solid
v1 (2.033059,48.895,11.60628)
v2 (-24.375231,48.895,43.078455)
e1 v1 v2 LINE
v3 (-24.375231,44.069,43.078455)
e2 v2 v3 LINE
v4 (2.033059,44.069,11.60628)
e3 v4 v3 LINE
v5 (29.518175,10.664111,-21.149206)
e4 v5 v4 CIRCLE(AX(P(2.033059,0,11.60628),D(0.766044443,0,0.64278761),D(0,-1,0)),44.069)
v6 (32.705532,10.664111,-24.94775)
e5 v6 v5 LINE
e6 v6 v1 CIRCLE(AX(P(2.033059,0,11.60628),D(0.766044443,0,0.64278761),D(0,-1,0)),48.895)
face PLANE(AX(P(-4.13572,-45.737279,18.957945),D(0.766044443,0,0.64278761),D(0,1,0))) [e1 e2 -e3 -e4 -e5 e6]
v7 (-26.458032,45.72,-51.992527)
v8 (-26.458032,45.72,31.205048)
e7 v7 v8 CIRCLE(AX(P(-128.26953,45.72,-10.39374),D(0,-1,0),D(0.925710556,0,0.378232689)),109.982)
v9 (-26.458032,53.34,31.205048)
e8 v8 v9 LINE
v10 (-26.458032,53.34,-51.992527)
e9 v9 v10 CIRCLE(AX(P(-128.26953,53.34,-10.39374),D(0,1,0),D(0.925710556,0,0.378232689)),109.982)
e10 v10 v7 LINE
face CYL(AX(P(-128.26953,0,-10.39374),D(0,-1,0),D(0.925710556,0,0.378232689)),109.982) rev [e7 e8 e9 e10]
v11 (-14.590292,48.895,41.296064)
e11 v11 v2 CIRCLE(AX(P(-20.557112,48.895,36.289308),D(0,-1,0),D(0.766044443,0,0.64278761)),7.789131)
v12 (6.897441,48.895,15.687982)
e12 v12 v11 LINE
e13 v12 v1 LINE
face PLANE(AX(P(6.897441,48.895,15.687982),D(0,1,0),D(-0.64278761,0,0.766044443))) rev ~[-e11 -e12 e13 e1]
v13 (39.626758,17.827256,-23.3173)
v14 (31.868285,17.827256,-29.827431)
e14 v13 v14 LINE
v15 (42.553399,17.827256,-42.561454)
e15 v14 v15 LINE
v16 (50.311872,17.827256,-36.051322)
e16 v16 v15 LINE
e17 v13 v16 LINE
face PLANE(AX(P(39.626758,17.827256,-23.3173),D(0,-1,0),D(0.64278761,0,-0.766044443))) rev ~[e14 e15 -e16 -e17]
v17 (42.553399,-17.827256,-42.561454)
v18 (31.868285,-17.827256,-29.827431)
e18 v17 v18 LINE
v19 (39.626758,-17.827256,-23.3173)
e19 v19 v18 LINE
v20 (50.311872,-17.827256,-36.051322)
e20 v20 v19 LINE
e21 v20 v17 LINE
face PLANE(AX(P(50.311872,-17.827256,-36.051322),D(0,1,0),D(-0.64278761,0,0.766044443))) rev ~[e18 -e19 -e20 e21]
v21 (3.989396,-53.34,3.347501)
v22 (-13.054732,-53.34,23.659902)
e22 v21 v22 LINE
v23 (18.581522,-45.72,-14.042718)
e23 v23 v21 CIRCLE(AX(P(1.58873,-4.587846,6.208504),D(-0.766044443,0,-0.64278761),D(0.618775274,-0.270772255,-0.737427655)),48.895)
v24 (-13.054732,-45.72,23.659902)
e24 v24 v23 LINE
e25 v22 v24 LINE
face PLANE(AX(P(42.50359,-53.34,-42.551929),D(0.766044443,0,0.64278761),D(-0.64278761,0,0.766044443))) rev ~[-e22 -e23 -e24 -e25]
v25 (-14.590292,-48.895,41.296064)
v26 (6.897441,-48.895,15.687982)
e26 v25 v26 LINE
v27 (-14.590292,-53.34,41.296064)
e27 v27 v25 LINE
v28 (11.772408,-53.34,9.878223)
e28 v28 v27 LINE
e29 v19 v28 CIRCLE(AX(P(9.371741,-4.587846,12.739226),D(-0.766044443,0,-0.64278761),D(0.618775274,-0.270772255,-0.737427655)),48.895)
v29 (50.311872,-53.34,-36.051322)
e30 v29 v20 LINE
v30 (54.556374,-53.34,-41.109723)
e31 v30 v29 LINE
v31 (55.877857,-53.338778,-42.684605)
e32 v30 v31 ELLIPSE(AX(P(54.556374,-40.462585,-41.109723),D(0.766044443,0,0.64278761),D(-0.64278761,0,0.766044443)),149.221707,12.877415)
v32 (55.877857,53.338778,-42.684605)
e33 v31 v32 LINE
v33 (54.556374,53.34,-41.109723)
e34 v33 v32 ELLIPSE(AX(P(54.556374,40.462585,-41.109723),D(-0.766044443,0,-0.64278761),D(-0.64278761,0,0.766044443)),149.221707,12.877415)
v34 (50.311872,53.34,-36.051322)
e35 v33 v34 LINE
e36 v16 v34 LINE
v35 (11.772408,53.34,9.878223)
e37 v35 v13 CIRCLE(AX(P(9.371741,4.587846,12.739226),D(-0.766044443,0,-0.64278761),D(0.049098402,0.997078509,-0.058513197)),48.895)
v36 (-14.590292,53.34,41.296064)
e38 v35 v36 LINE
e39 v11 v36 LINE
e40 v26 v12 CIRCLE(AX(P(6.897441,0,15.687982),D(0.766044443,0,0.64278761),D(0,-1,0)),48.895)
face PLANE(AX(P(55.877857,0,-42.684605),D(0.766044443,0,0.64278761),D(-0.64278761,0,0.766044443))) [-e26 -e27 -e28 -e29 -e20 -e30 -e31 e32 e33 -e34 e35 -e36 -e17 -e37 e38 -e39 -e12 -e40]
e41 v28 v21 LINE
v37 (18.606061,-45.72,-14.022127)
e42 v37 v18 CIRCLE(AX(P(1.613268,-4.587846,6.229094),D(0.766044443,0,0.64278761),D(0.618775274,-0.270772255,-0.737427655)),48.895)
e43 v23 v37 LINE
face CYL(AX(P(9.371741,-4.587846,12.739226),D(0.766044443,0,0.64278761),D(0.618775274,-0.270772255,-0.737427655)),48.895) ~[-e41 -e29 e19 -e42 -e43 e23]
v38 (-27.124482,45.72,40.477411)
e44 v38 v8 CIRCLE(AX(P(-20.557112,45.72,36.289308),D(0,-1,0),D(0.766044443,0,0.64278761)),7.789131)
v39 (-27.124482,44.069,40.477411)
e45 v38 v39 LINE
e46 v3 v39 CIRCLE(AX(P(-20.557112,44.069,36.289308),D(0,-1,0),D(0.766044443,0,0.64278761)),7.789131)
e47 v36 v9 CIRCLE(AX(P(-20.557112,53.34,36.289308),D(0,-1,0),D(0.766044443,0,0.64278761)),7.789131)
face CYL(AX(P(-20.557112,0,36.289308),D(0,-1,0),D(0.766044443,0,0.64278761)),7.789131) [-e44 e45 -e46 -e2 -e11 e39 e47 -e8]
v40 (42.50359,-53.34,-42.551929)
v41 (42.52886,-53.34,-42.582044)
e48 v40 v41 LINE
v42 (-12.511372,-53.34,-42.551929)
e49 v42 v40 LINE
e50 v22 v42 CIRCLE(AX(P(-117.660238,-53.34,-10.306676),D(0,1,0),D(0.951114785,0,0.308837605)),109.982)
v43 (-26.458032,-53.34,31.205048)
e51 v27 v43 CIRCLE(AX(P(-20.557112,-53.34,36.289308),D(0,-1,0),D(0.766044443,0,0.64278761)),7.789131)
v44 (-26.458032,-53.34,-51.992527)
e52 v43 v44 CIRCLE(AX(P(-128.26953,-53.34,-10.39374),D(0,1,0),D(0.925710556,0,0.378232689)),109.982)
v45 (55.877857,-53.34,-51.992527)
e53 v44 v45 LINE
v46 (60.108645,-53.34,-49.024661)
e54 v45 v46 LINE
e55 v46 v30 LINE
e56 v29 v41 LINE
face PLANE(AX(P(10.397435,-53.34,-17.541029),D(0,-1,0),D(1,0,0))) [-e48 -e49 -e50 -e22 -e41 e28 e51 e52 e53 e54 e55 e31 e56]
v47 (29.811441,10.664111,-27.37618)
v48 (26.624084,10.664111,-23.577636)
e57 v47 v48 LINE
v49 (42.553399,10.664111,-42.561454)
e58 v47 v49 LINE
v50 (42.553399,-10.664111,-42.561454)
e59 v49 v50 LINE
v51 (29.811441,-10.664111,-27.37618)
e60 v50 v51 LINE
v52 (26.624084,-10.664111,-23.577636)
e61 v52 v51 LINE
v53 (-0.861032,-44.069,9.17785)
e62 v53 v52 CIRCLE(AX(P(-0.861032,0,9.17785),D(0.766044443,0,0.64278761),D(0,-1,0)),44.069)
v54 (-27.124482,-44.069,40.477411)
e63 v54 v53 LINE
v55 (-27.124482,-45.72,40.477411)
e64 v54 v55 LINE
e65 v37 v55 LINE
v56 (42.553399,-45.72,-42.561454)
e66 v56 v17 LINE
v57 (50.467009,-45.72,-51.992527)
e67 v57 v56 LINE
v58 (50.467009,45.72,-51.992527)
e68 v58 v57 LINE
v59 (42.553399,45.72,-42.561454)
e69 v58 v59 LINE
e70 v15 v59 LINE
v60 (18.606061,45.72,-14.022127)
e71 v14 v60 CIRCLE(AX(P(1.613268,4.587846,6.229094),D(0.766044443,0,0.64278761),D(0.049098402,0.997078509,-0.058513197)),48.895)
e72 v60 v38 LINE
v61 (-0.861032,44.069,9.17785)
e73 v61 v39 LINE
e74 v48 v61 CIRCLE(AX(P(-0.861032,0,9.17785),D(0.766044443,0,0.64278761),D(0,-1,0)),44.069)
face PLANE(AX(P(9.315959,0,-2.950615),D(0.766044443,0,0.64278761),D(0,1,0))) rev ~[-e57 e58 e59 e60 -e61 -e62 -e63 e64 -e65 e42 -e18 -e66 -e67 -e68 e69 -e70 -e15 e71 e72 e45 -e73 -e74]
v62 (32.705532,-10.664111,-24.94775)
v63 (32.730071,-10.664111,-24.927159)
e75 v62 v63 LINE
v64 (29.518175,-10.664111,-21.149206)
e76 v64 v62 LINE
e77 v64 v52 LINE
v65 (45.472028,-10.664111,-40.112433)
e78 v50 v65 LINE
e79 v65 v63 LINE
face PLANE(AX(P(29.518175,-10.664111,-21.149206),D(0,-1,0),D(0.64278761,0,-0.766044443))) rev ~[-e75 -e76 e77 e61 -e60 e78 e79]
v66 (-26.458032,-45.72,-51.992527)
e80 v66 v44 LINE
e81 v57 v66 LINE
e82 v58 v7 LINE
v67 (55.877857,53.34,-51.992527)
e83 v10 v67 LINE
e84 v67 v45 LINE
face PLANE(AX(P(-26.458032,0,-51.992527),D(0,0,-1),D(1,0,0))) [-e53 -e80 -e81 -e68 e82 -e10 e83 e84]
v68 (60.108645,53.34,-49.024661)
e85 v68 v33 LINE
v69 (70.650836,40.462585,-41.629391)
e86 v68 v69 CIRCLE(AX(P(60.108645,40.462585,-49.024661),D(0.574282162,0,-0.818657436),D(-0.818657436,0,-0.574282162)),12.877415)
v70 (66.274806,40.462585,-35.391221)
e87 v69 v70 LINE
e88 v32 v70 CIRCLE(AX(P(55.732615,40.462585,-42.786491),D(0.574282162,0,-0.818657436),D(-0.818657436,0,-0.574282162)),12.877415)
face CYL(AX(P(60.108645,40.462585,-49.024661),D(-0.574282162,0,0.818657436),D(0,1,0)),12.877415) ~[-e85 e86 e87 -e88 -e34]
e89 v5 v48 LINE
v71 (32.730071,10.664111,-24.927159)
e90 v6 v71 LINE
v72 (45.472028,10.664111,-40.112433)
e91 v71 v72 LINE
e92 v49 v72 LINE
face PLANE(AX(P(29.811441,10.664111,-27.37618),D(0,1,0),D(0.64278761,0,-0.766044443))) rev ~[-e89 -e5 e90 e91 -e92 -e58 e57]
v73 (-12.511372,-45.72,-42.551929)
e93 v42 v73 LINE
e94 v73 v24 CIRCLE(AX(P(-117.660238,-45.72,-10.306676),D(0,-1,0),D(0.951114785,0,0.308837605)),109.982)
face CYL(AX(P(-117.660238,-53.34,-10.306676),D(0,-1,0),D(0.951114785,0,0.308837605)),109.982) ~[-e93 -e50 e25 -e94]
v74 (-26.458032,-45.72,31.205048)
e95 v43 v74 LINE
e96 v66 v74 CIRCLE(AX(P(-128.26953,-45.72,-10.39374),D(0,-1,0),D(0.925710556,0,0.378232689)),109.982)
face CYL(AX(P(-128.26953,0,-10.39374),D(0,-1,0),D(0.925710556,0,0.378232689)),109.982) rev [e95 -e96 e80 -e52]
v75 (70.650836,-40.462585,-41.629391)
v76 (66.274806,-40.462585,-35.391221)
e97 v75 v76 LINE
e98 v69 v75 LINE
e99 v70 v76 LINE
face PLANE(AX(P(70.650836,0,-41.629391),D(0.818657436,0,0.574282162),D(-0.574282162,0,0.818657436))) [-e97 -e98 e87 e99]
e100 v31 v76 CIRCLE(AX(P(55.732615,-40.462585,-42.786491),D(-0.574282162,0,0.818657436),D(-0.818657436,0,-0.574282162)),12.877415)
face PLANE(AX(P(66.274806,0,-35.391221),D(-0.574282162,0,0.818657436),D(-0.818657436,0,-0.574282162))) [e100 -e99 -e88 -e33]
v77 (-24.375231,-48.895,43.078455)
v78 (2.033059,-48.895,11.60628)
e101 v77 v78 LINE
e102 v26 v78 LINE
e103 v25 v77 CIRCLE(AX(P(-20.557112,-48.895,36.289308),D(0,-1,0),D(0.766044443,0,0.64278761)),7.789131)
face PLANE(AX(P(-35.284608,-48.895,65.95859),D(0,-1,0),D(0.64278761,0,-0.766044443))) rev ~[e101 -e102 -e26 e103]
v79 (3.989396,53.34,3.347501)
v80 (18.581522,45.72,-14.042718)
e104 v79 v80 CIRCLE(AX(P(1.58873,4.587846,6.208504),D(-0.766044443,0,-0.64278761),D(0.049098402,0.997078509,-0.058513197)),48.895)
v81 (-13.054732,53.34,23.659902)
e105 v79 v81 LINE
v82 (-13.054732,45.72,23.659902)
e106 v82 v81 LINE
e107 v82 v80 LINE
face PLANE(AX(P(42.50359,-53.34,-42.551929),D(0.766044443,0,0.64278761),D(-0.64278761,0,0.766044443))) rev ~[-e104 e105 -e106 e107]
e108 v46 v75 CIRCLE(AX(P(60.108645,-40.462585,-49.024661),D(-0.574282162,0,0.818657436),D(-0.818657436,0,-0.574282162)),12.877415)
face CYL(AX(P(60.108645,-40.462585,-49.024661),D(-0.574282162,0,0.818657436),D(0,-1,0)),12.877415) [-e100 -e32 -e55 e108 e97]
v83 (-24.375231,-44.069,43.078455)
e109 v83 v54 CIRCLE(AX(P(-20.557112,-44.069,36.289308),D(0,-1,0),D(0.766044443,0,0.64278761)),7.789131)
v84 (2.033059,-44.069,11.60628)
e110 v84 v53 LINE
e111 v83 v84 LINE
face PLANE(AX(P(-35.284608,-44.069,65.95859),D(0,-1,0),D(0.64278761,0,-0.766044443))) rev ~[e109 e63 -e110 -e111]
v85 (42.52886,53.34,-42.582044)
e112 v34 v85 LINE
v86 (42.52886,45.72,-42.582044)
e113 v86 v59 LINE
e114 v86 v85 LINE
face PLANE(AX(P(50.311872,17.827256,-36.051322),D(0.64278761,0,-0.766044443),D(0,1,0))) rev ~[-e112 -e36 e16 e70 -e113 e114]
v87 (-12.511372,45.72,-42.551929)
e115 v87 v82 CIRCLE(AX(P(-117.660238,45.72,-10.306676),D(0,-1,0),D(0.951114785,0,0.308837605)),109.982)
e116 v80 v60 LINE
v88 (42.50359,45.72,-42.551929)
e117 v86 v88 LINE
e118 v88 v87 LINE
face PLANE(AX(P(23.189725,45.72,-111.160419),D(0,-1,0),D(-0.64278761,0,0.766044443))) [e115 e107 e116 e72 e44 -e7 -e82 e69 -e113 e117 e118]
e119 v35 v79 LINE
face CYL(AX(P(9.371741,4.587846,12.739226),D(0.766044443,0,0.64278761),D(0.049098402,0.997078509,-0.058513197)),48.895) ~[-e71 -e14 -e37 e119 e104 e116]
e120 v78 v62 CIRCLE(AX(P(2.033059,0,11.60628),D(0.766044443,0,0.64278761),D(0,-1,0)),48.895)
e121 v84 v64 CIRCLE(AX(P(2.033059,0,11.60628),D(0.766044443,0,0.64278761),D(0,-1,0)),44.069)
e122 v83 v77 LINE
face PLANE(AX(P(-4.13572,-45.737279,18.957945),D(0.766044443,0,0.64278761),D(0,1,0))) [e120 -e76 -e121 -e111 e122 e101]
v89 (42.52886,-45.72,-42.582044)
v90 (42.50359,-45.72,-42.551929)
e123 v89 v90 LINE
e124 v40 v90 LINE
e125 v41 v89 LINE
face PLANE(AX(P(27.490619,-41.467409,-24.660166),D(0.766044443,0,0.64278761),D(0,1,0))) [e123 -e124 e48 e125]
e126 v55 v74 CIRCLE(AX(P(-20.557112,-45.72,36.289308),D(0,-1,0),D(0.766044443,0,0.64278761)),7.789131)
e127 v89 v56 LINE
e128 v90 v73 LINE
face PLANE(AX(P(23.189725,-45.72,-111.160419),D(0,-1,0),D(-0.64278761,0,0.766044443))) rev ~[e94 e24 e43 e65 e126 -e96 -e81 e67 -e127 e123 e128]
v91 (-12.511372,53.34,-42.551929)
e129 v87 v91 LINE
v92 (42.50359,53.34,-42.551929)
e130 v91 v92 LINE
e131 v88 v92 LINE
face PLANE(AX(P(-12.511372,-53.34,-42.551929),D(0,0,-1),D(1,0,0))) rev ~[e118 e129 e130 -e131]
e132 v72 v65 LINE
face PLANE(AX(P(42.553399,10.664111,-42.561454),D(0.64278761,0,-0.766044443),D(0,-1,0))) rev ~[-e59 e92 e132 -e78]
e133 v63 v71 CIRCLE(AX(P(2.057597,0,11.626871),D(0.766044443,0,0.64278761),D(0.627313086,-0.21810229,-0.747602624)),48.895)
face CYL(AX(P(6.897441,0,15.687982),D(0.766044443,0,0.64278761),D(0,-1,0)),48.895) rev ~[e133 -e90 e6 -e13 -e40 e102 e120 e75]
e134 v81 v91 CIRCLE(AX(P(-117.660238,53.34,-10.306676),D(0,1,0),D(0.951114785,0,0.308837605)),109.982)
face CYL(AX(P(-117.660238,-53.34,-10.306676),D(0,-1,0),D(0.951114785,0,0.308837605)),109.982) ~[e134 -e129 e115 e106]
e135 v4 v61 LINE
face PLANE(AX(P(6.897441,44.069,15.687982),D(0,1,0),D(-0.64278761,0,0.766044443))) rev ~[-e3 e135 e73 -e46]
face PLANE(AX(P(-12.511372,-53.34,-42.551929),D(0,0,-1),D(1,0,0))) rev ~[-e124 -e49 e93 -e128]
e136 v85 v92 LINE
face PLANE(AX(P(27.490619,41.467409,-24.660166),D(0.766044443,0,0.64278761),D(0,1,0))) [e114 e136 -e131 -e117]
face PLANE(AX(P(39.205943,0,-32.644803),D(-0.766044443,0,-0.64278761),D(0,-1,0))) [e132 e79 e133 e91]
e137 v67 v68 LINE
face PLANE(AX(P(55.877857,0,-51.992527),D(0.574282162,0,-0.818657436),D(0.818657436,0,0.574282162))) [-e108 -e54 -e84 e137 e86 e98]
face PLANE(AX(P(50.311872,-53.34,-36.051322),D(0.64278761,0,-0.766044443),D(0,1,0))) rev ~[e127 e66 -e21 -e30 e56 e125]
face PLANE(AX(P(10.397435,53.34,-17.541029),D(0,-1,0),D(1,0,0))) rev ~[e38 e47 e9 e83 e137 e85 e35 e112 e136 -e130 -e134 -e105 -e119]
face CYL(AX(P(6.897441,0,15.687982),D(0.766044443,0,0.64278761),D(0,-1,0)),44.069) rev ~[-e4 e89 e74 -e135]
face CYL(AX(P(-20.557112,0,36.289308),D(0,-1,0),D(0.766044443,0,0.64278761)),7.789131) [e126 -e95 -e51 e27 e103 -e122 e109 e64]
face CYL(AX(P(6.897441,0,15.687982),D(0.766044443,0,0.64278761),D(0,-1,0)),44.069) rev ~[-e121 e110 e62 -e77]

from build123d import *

# Parameters (mm, degrees)
F1_DEPTH  = 53.34
F2_W      = 4.826
F2_H      = 32.1946403572
F3_DEPTH  = 6.35
F5_DEPTH  = 106.68
F7_W      = 91.44
F7_H      = 183.6228075896
F8_DEPTH  = 58.928
F9_DEPTH  = 25.4
F10_R     = 12.8774151417
F11_DEPTH = 10.16
F13_DEPTH = 25.4
F15_DEPTH = 3.81


# Not quite as in the source:
# - a feature names something its author has since deleted; it is built from what else it names


with BuildPart() as f1:
    # F0 (on Front) → F1 (new body, symmetric)
    with BuildSketch(Plane.XZ):
        with BuildLine():
            ThreePointArc((-26.4580316219, 31.2050478526), (-18.2875299748, -10.3937397156), (-26.4580316219, -51.9925272838))
            Line((-26.4580316219, -51.9925272838), (55.8778569108, -51.9925272838))
            Line((55.8778569108, -51.9925272838), (70.650836429, -41.6293909539))
            Line((70.650836429, -41.6293909539), (66.2748063527, -35.3912212887))
            Line((66.2748063527, -35.3912212887), (55.8778569108, -42.6846047493))
            Line((55.8778569108, -42.6846047493), (-14.5902915946, 41.2960643955))
            ThreePointArc((-14.5902915946, 41.2960643955), (-25.6027276184, 42.2233043466), (-26.4580316219, 31.2050478526))
        make_face()
    extrude(amount=F1_DEPTH, both=True)

    # F2 (on face) → F3 (cut)
    with BuildSketch(Plane(origin=(11.772407622, 0, 9.8782228937), x_dir=(0, 1, 0), z_dir=(0.7660444431, 0, 0.6427876097))):
        with BuildLine():
            ThreePointArc((-44.069, 28.7653259742), (-47.673235573, 18.4461288519), (-48.895, 7.584101647))
            Line((-48.895, 7.584101647), (-44.069, 7.584101647))
            Line((-44.069, 7.584101647), (-44.069, 28.7653259742))
        make_face()
        with BuildLine():
            ThreePointArc((44.069, 28.7653259742), (47.673235573, 18.4461288519), (48.895, 7.584101647))
            Line((48.895, 7.584101647), (48.895, 41.0130793115))
            Line((48.895, 41.0130793115), (44.069, 41.0130793115))
            Line((44.069, 41.0130793115), (44.069, 28.7653259742))
        make_face()
        with BuildLine():
            Line((-44.069, 41.0130793115), (-35.6822711903, 41.0130793115))
            ThreePointArc((-35.6822711903, 41.0130793115), (-19.4449371571, 52.4462844288), (0, 56.479101647))
            Line((0, 56.479101647), (0, 73.2077196687))
            Line((0, 73.2077196687), (-44.069, 73.2077196687))
            Line((-44.069, 73.2077196687), (-44.069, 41.0130793115))
        make_face()
        with Locations((-46.482, 57.1103994901)):
            Rectangle(F2_W, F2_H)
        with BuildLine():
            ThreePointArc((0, 56.479101647), (-19.4449371571, 52.4462844288), (-35.6822711903, 41.0130793115))
            Line((-35.6822711903, 41.0130793115), (-28.7155047544, 41.0130793115))
            ThreePointArc((-28.7155047544, 41.0130793115), (-15.3116809054, 48.9075718407), (0, 51.653101647))
            Line((0, 51.653101647), (0, 56.479101647))
        make_face()
        with BuildLine():
            Line((28.7155047544, 41.0130793115), (35.6822711903, 41.0130793115))
            ThreePointArc((35.6822711903, 41.0130793115), (19.4449371571, 52.4462844288), (0, 56.479101647))
            Line((0, 56.479101647), (0, 51.653101647))
            ThreePointArc((0, 51.653101647), (15.3116809054, 48.9075718407), (28.7155047544, 41.0130793115))
        make_face()
        with BuildLine():
            Line((-48.895, 41.0130793115), (-48.895, 7.584101647))
            ThreePointArc((-48.895, 7.584101647), (-47.673235573, 18.4461288519), (-44.069, 28.7653259742))
            Line((-44.069, 28.7653259742), (-44.069, 41.0130793115))
            Line((-44.069, 41.0130793115), (-48.895, 41.0130793115))
        make_face()
        with BuildLine():
            ThreePointArc((0, 56.479101647), (19.4449371571, 52.4462844288), (35.6822711903, 41.0130793115))
            Line((35.6822711903, 41.0130793115), (44.069, 41.0130793115))
            Line((44.069, 41.0130793115), (44.069, 73.082752475))
            Line((44.069, 73.082752475), (0, 73.2077196687))
            Line((0, 73.2077196687), (0, 56.479101647))
        make_face()
        with BuildLine():
            Line((-44.069, 41.0130793115), (-44.069, 28.7653259742))
            ThreePointArc((-44.069, 28.7653259742), (-40.3431305128, 35.2093228303), (-35.6822711903, 41.0130793115))
            Line((-35.6822711903, 41.0130793115), (-44.069, 41.0130793115))
        make_face()
        with BuildLine():
            ThreePointArc((-35.6822711903, 41.0130793115), (-40.3431305128, 35.2093228303), (-44.069, 28.7653259742))
            Line((-44.069, 28.7653259742), (-44.069, 7.584101647))
            ThreePointArc((-44.069, 7.584101647), (-40.0470993957, 25.9772142435), (-28.7155047544, 41.0130793115))
            Line((-28.7155047544, 41.0130793115), (-35.6822711903, 41.0130793115))
        make_face()
        with BuildLine():
            Line((44.069, 7.584101647), (44.069, 28.7653259742))
            ThreePointArc((44.069, 28.7653259742), (40.3431305128, 35.2093228303), (35.6822711903, 41.0130793115))
            Line((35.6822711903, 41.0130793115), (28.7155047544, 41.0130793115))
            ThreePointArc((28.7155047544, 41.0130793115), (40.0470993957, 25.9772142435), (44.069, 7.584101647))
        make_face()
        with BuildLine():
            Line((-44.069, 7.584101647), (-48.895, 7.584101647))
            ThreePointArc((-48.895, 7.584101647), (0, -41.310898353), (48.895, 7.584101647))
            ThreePointArc((48.895, 7.584101647), (47.673235573, 18.4461288519), (44.069, 28.7653259742))
            Line((44.069, 28.7653259742), (44.069, 7.584101647))
            ThreePointArc((44.069, 7.584101647), (0, -36.484898353), (-44.069, 7.584101647))
        make_face()
        with BuildLine():
            Line((0, 7.584101647), (-44.069, 7.584101647))
            ThreePointArc((-44.069, 7.584101647), (0, -36.484898353), (44.069, 7.584101647))
            ThreePointArc((44.069, 7.584101647), (40.0470993957, 25.9772142435), (28.7155047544, 41.0130793115))
            Line((28.7155047544, 41.0130793115), (0, 41.0130793115))
            Line((0, 41.0130793115), (0, 7.584101647))
        make_face()
        with BuildLine():
            ThreePointArc((-28.7155047544, 41.0130793115), (-40.0470993957, 25.9772142435), (-44.069, 7.584101647))
            Line((-44.069, 7.584101647), (0, 7.584101647))
            Line((0, 7.584101647), (0, 41.0130793115))
            Line((0, 41.0130793115), (-28.7155047544, 41.0130793115))
        make_face()
        with BuildLine():
            ThreePointArc((35.6822711903, 41.0130793115), (40.3431305128, 35.2093228303), (44.069, 28.7653259742))
            Line((44.069, 28.7653259742), (44.069, 41.0130793115))
            Line((44.069, 41.0130793115), (35.6822711903, 41.0130793115))
        make_face()
        Polygon((44.069, 41.0130793115), (48.895, 41.0130793115), (48.895, 73.2077196687), (44.069, 73.2077196687), (44.069, 73.082752475), align=None)
    extrude(amount=-F3_DEPTH, mode=Mode.SUBTRACT)

    # F4 (on face) → F5 (cut, through all)
    with BuildSketch(Plane.XZ.offset(53.34)):
        with BuildLine():
            Line((42.5035902841, -42.5519285295), (-13.0547319913, 23.6599016408))
            ThreePointArc((-13.0547319913, 23.6599016408), (-7.6819414216, -9.4041517757), (-12.5113723521, -42.5519285295))
            Line((-12.5113723521, -42.5519285295), (42.5035902841, -42.5519285295))
        make_face()
    extrude(amount=-F5_DEPTH, mode=Mode.SUBTRACT)

    # F7 (on face) → F8 (cut)
    with BuildSketch(Plane(origin=(-41.1275322828, 0, -34.5100971697), x_dir=(0, 1, 0), z_dir=(0.7660444431, 0, 0.6427876097))):
        with Locations((0, -8.2484856248)):
            Rectangle(F7_W, F7_H)
    extrude(amount=F8_DEPTH, mode=Mode.SUBTRACT)

    # F2 (on face) → F9 (cut)
    with BuildSketch(Plane(origin=(11.772407622, 0, 9.8782228937), x_dir=(0, 1, 0), z_dir=(0.7660444431, 0, 0.6427876097))):
        with BuildLine():
            ThreePointArc((-28.7155047544, 41.0130793115), (-40.0470993957, 25.9772142435), (-44.069, 7.584101647))
            Line((-44.069, 7.584101647), (0, 7.584101647))
            Line((0, 7.584101647), (0, 41.0130793115))
            Line((0, 41.0130793115), (-28.7155047544, 41.0130793115))
        make_face()
        with BuildLine():
            Line((0, 7.584101647), (-44.069, 7.584101647))
            ThreePointArc((-44.069, 7.584101647), (0, -36.484898353), (44.069, 7.584101647))
            ThreePointArc((44.069, 7.584101647), (40.0470993957, 25.9772142435), (28.7155047544, 41.0130793115))
            Line((28.7155047544, 41.0130793115), (0, 41.0130793115))
            Line((0, 41.0130793115), (0, 7.584101647))
        make_face()
        with BuildLine():
            ThreePointArc((-35.6822711903, 41.0130793115), (-40.3431305128, 35.2093228303), (-44.069, 28.7653259742))
            Line((-44.069, 28.7653259742), (-44.069, 7.584101647))
            ThreePointArc((-44.069, 7.584101647), (-40.0470993957, 25.9772142435), (-28.7155047544, 41.0130793115))
            Line((-28.7155047544, 41.0130793115), (-35.6822711903, 41.0130793115))
        make_face()
        with BuildLine():
            Line((44.069, 7.584101647), (44.069, 28.7653259742))
            ThreePointArc((44.069, 28.7653259742), (40.3431305128, 35.2093228303), (35.6822711903, 41.0130793115))
            Line((35.6822711903, 41.0130793115), (28.7155047544, 41.0130793115))
            ThreePointArc((28.7155047544, 41.0130793115), (40.0470993957, 25.9772142435), (44.069, 7.584101647))
        make_face()
        with BuildLine():
            Line((28.7155047544, 41.0130793115), (35.6822711903, 41.0130793115))
            ThreePointArc((35.6822711903, 41.0130793115), (19.4449371571, 52.4462844288), (0, 56.479101647))
            Line((0, 56.479101647), (0, 51.653101647))
            ThreePointArc((0, 51.653101647), (15.3116809054, 48.9075718407), (28.7155047544, 41.0130793115))
        make_face()
        with BuildLine():
            ThreePointArc((0, 56.479101647), (-19.4449371571, 52.4462844288), (-35.6822711903, 41.0130793115))
            Line((-35.6822711903, 41.0130793115), (-28.7155047544, 41.0130793115))
            ThreePointArc((-28.7155047544, 41.0130793115), (-15.3116809054, 48.9075718407), (0, 51.653101647))
            Line((0, 51.653101647), (0, 56.479101647))
        make_face()
        with BuildLine():
            Line((-44.069, 41.0130793115), (-35.6822711903, 41.0130793115))
            ThreePointArc((-35.6822711903, 41.0130793115), (-19.4449371571, 52.4462844288), (0, 56.479101647))
            Line((0, 56.479101647), (0, 73.2077196687))
            Line((0, 73.2077196687), (-44.069, 73.2077196687))
            Line((-44.069, 73.2077196687), (-44.069, 41.0130793115))
        make_face()
        with BuildLine():
            Line((-44.069, 41.0130793115), (-44.069, 28.7653259742))
            ThreePointArc((-44.069, 28.7653259742), (-40.3431305128, 35.2093228303), (-35.6822711903, 41.0130793115))
            Line((-35.6822711903, 41.0130793115), (-44.069, 41.0130793115))
        make_face()
        with BuildLine():
            ThreePointArc((0, 56.479101647), (19.4449371571, 52.4462844288), (35.6822711903, 41.0130793115))
            Line((35.6822711903, 41.0130793115), (44.069, 41.0130793115))
            Line((44.069, 41.0130793115), (44.069, 73.082752475))
            Line((44.069, 73.082752475), (0, 73.2077196687))
            Line((0, 73.2077196687), (0, 56.479101647))
        make_face()
        with BuildLine():
            ThreePointArc((35.6822711903, 41.0130793115), (40.3431305128, 35.2093228303), (44.069, 28.7653259742))
            Line((44.069, 28.7653259742), (44.069, 41.0130793115))
            Line((44.069, 41.0130793115), (35.6822711903, 41.0130793115))
        make_face()
        with BuildLine():
            Line((0, 51.653101647), (0, 41.0130793115))
            Line((0, 41.0130793115), (28.7155047544, 41.0130793115))
            ThreePointArc((28.7155047544, 41.0130793115), (15.3116809054, 48.9075718407), (0, 51.653101647))
        make_face()
        with BuildLine():
            ThreePointArc((0, 51.653101647), (-15.3116809054, 48.9075718407), (-28.7155047544, 41.0130793115))
            Line((-28.7155047544, 41.0130793115), (0, 41.0130793115))
            Line((0, 41.0130793115), (0, 51.653101647))
        make_face()
    extrude(amount=-F9_DEPTH, mode=Mode.SUBTRACT)

    # F10
    f10_edges = [f1.edges().sort_by_distance(p)[0] for p in [
        (68.462821, -53.34, -38.510306),
        (68.462821, 53.34, -38.510306),
    ]]
    fillet(f10_edges, radius=F10_R)

    # F2 (on face) → F11 (cut)
    with BuildSketch(Plane(origin=(11.772407622, 0, 9.8782228937), x_dir=(0, 1, 0), z_dir=(0.7660444431, 0, 0.6427876097))):
        with BuildLine():
            ThreePointArc((-17.8272557182, -43.3336769488), (-42.4057040411, -27.2576552243), (-53.34, 0))
            Line((-53.34, 0), (-53.34, -59.9567629397))
            Line((-53.34, -59.9567629397), (-17.8272557182, -59.9567629397))
            Line((-17.8272557182, -59.9567629397), (-17.8272557182, -43.3336769488))
        make_face()
        with BuildLine():
            Line((53.34, -59.9567629397), (53.34, 0))
            ThreePointArc((53.34, 0), (42.4057040411, -27.2576552243), (17.8272557182, -43.3336769488))
            Line((17.8272557182, -43.3336769488), (17.8272557182, -59.9567629397))
            Line((17.8272557182, -59.9567629397), (53.34, -59.9567629397))
        make_face()
    extrude(amount=-F11_DEPTH, mode=Mode.SUBTRACT)

    # F12 (on face) → F13 (cut)
    with BuildSketch(Plane(origin=(6.9080254082, 0, 5.7965215722), x_dir=(0, 1, 0), z_dir=(0.7660444431, 0, 0.6427876097))):
        with BuildLine():
            ThreePointArc((0, -36.484898353), (-5.3721205729, -36.1562353608), (-10.6641114754, -35.1751486673))
            Line((-10.6641114754, -35.1751486673), (-10.6641114754, -40.1337959538))
            ThreePointArc((-10.6641114754, -40.1337959538), (-5.3644394772, -41.0157318311), (0, -41.310898353))
            Line((0, -41.310898353), (0, -36.484898353))
        make_face()
        with BuildLine():
            ThreePointArc((10.6641114754, -35.1751486673), (5.3721205729, -36.1562353608), (0, -36.484898353))
            Line((0, -36.484898353), (0, -41.310898353))
            ThreePointArc((0, -41.310898353), (5.3644394772, -41.0157318311), (10.6641114754, -40.1337959538))
            Line((10.6641114754, -40.1337959538), (10.6641114754, -35.1751486673))
        make_face()
    extrude(amount=-F13_DEPTH, mode=Mode.SUBTRACT)

    # F14 (on face) → F15 (cut)
    with BuildSketch(Plane(origin=(4.0139346614, 0, 3.3680910939), x_dir=(0, -1, 0), z_dir=(-0.7660444431, 0, -0.6427876097))):
        with BuildLine():
            ThreePointArc((10.6641114754, -40.1337959538), (0, -41.310898353), (-10.6641114754, -40.1337959538))
            Line((-10.6641114754, -40.1337959538), (-10.6641114754, -59.9567629397))
            Line((-10.6641114754, -59.9567629397), (10.6641114754, -59.9567629397))
            Line((10.6641114754, -59.9567629397), (10.6641114754, -40.1337959538))
        make_face()
    extrude(amount=-F15_DEPTH, mode=Mode.SUBTRACT)


solid = f1.part
